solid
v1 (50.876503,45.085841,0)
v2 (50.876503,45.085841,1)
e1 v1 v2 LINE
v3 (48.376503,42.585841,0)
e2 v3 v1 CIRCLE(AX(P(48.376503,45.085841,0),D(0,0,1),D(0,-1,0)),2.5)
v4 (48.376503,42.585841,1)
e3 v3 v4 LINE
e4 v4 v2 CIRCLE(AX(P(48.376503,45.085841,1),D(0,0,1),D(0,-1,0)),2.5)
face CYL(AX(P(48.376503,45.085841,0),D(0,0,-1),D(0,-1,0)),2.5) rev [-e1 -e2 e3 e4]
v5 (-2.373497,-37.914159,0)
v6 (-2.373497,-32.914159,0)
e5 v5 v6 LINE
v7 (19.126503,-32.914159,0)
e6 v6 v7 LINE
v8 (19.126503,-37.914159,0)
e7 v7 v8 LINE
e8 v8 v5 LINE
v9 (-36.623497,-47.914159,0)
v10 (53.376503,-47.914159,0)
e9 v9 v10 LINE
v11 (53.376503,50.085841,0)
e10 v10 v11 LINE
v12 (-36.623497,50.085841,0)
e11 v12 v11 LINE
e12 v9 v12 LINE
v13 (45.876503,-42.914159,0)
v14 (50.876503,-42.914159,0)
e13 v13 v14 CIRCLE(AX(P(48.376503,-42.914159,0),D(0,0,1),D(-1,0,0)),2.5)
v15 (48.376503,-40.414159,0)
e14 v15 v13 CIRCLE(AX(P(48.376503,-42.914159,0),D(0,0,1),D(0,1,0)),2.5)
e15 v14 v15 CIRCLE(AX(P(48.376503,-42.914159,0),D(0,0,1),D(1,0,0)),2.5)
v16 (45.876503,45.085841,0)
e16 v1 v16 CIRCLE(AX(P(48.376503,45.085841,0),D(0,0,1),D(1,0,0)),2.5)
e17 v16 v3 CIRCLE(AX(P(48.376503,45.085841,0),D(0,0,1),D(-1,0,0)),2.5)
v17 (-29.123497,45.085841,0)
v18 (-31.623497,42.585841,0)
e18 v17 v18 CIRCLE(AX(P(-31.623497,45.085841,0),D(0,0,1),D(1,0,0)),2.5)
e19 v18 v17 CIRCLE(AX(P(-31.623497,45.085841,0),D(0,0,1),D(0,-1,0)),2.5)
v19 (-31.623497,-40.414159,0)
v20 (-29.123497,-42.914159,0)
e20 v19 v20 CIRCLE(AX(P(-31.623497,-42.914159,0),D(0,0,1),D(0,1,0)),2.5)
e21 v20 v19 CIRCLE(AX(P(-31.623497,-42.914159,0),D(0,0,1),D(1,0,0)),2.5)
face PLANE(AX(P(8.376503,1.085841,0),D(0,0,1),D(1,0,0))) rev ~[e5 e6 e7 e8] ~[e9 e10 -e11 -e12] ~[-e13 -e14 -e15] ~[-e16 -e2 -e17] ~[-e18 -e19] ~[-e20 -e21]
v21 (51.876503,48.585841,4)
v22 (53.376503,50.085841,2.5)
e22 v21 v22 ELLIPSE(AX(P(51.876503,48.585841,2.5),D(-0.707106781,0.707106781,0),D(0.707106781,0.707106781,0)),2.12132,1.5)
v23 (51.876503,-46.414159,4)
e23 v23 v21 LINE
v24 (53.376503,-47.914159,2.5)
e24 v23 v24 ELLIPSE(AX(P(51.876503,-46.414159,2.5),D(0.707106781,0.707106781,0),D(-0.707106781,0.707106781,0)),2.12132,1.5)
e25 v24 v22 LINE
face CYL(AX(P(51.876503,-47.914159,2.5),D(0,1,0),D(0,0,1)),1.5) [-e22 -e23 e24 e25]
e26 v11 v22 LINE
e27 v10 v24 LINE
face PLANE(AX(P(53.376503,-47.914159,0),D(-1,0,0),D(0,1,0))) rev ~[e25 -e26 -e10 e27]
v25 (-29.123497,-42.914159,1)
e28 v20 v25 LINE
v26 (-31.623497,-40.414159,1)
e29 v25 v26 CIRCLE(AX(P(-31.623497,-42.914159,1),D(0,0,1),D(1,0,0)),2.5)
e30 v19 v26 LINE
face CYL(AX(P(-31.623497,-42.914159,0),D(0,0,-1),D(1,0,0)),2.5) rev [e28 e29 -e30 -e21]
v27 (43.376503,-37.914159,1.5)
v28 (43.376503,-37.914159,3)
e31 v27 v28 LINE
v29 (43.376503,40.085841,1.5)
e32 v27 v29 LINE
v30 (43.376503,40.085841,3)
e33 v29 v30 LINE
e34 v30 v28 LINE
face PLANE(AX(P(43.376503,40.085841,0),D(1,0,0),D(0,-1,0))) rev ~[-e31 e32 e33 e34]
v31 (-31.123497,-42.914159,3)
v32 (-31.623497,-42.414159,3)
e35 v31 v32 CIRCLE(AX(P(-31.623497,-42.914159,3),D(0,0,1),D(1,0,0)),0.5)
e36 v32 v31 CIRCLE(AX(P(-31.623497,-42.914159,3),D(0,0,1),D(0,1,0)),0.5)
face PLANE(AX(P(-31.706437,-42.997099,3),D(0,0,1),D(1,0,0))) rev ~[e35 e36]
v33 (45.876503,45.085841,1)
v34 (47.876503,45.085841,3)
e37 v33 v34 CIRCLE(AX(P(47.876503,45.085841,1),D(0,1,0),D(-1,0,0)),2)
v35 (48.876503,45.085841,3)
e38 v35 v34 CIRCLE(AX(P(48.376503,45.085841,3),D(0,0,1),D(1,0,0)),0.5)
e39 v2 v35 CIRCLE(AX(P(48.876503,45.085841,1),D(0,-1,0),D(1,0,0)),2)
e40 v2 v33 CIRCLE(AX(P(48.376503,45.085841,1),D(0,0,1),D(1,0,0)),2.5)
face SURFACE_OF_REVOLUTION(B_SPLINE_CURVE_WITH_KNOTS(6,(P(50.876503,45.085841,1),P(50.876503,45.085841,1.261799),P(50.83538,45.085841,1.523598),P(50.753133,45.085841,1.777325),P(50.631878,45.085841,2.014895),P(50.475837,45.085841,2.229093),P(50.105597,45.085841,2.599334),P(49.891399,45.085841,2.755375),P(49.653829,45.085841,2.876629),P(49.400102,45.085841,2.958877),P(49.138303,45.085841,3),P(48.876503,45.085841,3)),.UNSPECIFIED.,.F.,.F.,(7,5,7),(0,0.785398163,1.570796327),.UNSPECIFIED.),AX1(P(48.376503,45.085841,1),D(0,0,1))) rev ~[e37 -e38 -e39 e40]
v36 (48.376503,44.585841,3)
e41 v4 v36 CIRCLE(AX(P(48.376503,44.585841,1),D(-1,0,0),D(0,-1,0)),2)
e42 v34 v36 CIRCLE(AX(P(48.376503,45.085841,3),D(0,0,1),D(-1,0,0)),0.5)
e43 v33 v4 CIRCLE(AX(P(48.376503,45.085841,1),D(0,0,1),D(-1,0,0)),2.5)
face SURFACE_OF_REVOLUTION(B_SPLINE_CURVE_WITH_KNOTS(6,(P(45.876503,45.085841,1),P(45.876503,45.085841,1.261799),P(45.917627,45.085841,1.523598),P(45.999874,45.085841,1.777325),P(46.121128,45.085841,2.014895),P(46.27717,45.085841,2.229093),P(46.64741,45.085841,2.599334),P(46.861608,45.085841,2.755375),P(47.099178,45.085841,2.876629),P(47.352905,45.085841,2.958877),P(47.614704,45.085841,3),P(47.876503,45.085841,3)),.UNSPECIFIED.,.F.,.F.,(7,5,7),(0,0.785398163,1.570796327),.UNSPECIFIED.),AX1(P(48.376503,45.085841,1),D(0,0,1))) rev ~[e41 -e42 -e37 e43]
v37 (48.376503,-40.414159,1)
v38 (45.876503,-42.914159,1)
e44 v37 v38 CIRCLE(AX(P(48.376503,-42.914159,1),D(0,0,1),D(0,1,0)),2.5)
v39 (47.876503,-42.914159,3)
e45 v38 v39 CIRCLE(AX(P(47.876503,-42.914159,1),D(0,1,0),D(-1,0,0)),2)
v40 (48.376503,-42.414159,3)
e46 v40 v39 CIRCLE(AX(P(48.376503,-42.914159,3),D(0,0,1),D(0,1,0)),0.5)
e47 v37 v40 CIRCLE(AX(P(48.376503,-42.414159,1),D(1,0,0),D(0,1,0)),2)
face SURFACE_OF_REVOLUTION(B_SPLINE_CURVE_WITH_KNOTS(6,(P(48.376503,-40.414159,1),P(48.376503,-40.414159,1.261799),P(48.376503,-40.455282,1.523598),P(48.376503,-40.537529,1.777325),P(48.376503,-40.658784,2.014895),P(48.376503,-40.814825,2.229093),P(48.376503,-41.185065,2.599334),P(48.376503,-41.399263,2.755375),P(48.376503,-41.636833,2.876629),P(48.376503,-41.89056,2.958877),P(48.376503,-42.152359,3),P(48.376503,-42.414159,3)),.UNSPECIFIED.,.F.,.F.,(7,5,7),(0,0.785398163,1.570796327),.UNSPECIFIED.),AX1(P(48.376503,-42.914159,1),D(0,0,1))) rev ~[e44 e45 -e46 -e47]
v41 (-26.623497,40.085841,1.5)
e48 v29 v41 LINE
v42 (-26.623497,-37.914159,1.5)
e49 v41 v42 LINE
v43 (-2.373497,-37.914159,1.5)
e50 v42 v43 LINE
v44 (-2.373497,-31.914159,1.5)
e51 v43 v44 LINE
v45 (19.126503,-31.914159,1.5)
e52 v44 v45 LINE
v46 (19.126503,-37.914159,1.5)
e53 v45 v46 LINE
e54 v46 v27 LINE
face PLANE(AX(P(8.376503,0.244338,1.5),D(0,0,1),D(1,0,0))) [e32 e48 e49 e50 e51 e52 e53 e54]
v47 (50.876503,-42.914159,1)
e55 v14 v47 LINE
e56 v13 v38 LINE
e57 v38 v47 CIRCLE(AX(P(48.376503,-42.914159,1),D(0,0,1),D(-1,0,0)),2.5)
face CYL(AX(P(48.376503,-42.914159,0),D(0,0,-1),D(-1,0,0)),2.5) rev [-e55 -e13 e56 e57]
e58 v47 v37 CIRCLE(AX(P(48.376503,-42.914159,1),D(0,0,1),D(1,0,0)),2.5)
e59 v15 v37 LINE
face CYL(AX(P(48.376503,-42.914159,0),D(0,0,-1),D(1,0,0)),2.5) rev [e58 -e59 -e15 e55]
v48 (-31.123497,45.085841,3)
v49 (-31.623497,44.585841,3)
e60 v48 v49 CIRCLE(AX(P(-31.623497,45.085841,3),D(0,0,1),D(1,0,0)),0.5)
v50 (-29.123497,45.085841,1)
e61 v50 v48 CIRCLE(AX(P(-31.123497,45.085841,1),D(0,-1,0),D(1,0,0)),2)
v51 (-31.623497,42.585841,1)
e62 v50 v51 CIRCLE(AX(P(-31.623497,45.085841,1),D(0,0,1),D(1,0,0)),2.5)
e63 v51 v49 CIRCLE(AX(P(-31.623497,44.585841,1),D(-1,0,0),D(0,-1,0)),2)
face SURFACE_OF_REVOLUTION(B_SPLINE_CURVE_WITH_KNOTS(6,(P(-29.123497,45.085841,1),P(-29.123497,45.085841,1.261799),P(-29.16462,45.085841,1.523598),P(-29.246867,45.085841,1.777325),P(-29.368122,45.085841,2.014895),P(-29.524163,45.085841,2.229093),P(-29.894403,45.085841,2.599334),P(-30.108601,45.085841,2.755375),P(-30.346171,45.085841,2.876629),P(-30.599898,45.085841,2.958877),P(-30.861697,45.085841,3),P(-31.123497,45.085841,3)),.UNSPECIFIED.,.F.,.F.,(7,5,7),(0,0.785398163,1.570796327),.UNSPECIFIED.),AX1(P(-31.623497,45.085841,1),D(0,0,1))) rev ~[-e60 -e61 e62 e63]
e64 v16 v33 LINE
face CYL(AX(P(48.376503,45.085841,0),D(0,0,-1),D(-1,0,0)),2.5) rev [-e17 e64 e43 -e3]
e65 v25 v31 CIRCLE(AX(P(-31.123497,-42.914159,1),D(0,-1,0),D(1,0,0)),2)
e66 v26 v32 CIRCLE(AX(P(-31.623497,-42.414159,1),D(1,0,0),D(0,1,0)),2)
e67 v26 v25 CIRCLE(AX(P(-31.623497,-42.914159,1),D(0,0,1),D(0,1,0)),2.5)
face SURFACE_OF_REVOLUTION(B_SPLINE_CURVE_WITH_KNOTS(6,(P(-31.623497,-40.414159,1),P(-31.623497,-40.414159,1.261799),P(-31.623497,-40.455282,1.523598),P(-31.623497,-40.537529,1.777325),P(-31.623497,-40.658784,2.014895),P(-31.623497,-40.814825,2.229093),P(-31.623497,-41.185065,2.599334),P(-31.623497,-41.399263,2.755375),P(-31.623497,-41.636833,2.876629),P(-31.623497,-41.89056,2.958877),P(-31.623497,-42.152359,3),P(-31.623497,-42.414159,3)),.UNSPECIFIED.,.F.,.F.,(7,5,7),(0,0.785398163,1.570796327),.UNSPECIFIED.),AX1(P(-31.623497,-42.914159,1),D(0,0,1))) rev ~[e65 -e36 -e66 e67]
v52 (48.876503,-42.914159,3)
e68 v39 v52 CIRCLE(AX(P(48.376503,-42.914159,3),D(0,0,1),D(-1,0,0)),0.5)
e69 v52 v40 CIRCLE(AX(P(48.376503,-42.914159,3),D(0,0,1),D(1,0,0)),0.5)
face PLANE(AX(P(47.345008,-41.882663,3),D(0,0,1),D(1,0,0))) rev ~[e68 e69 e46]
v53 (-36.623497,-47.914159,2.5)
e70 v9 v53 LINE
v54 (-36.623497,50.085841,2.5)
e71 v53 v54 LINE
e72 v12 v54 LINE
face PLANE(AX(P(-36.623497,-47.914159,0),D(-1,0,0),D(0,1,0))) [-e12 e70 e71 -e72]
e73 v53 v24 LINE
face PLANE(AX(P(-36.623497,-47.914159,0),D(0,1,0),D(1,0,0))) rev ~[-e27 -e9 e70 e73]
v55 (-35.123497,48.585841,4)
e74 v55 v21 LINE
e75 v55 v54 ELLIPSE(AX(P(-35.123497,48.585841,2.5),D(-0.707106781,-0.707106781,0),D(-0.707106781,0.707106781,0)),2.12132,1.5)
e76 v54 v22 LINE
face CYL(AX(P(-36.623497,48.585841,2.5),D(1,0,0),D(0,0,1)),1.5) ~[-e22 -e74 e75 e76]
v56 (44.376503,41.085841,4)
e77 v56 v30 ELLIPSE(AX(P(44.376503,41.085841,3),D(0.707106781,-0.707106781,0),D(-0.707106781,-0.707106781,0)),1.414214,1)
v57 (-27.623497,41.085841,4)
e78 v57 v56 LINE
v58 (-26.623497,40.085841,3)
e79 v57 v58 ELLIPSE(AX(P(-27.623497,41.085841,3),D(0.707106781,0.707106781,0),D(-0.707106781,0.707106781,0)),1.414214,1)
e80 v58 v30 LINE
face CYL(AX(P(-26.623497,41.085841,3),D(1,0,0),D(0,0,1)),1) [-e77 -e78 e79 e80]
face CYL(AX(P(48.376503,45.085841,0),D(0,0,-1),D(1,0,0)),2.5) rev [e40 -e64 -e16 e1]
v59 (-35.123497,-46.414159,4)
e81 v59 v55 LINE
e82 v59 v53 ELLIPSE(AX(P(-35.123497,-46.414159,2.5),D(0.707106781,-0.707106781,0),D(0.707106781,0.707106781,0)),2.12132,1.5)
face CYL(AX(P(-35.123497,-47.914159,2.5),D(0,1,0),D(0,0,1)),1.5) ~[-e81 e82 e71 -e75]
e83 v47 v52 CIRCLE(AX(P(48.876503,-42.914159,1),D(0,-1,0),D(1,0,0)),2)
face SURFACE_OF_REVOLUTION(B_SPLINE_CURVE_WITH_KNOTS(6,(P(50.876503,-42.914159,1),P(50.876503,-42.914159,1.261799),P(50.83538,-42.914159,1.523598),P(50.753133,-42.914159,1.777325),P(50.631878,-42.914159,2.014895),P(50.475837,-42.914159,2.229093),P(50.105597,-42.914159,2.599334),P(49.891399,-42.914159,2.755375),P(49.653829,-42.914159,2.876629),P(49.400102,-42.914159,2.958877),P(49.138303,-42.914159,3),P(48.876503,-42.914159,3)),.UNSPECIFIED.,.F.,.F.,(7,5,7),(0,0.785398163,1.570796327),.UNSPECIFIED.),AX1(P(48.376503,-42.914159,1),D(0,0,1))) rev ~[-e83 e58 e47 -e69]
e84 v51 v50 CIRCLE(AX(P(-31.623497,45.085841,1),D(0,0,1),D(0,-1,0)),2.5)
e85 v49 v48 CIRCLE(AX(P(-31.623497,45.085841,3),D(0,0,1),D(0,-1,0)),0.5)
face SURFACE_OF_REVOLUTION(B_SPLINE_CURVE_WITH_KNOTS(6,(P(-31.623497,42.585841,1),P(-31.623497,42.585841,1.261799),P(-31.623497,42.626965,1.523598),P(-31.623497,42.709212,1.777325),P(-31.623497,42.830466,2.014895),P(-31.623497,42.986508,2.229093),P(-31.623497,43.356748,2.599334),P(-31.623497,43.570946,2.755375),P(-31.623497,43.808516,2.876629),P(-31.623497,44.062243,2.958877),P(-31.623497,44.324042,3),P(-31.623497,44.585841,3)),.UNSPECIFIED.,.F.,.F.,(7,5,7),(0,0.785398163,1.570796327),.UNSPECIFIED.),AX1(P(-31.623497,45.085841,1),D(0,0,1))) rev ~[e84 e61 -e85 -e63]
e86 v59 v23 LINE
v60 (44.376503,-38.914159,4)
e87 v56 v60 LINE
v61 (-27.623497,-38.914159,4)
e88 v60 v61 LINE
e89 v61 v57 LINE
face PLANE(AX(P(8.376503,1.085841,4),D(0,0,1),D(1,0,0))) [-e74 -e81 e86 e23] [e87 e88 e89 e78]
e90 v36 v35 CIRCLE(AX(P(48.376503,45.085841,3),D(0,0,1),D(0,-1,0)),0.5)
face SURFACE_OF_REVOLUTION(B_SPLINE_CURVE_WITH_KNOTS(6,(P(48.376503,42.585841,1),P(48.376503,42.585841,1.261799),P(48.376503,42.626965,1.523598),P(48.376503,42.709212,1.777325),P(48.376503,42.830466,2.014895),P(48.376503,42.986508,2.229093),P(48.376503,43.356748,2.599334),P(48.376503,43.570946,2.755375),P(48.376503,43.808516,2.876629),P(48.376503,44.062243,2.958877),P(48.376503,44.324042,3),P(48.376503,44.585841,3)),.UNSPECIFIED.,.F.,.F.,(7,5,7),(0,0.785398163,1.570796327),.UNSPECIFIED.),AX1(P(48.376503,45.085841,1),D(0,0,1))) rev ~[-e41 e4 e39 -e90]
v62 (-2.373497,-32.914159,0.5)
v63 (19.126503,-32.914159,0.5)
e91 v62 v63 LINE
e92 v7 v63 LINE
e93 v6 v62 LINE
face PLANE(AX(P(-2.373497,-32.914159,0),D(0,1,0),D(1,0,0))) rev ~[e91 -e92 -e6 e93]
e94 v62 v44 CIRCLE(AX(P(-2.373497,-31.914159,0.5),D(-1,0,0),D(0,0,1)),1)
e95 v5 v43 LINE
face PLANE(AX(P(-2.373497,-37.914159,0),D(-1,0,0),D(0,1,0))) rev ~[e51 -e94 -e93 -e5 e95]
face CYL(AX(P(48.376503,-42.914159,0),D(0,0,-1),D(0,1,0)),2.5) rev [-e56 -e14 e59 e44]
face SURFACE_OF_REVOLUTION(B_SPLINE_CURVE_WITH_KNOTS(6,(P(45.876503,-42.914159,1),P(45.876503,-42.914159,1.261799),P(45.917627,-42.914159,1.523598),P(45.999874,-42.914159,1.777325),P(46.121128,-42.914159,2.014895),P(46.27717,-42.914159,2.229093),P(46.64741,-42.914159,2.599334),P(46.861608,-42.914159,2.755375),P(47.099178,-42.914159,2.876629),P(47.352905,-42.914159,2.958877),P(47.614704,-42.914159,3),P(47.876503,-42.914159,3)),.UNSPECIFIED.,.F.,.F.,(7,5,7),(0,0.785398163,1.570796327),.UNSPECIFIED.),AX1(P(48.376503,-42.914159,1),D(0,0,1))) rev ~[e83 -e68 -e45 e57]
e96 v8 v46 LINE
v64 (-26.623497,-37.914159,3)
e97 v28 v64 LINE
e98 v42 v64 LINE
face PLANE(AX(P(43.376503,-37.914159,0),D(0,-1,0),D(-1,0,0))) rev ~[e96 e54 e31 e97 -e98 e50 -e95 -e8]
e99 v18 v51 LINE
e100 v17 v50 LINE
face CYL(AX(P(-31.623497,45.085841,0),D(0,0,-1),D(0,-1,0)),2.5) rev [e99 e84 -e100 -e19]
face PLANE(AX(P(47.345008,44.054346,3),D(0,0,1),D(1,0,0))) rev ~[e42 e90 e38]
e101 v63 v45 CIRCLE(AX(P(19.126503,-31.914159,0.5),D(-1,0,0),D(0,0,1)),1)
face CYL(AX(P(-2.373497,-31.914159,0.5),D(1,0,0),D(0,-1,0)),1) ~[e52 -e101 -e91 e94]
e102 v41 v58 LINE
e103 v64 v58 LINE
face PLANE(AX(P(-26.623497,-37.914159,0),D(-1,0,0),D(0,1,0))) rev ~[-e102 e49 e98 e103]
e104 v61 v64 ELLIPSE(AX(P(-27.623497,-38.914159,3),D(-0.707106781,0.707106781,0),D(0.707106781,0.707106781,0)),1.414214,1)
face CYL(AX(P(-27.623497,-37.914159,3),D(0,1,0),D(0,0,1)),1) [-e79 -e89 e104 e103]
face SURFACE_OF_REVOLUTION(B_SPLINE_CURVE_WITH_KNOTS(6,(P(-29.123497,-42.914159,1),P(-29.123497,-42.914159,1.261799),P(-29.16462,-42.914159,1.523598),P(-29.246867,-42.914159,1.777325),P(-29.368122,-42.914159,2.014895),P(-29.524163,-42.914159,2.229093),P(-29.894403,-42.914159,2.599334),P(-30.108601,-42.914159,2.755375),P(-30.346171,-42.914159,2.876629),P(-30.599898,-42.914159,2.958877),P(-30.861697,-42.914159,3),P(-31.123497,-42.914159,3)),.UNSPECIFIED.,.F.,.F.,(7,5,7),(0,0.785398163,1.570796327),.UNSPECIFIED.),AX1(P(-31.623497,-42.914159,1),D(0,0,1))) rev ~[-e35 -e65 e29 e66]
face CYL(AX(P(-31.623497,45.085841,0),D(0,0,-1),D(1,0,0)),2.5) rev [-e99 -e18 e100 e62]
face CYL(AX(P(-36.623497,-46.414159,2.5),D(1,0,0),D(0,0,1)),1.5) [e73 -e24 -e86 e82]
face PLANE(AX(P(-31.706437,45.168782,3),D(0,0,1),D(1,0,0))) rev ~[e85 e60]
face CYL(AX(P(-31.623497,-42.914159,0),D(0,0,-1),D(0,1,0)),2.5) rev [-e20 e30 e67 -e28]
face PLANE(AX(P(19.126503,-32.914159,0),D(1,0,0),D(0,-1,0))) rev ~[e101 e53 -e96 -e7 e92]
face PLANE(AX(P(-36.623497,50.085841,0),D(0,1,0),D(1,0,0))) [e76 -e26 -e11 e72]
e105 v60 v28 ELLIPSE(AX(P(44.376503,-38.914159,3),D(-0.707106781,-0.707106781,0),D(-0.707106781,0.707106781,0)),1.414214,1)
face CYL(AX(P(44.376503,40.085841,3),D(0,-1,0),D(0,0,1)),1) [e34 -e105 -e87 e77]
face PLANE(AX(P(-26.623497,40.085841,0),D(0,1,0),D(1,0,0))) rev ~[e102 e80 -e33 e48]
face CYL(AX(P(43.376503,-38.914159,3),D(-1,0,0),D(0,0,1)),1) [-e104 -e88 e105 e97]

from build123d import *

# Parameters (mm, degrees)
F1_DEPTH = 1.5
F0_W     = 90
F0_H     = 98
F2_DEPTH = 4
F3_R     = 1
F4_R     = 1.5
F5_DEPTH = 3
F6_R     = 2


with BuildPart() as f1:
    # F0 (on Top) → F1 (new body)
    with BuildSketch(Plane.XY):
        Polygon((43.3765034378, 40.0858414471), (-26.6234965622, 40.0858414471), (-26.6234965622, -37.9141585529), (-2.3734965622, -37.9141585529), (-2.3734965622, -32.9141585529), (19.1265034378, -32.9141585529), (19.1265034378, -37.9141585529), (43.3765034378, -37.9141585529), align=None)
    extrude(amount=F1_DEPTH)

    # F0 (on Top) → F2 (join)
    with BuildSketch(Plane.XY):
        with Locations((8.3765034378, 1.0858414471)):
            Rectangle(F0_W, F0_H)
        with BuildLine():
            ThreePointArc((-31.6234965622, 42.5858414471), (-33.3912635152, 46.8536084001), (-29.1234965622, 45.0858414471))
            Line((-29.1234965622, 45.0858414471), (45.8765034378, 45.0858414471))
            ThreePointArc((45.8765034378, 45.0858414471), (48.3765034378, 47.5858414471), (50.8765034378, 45.0858414471))
            ThreePointArc((50.8765034378, 45.0858414471), (50.1442703907, 43.3180744941), (48.3765034378, 42.5858414471))
            Line((48.3765034378, 42.5858414471), (48.3765034378, -40.4141585529))
            ThreePointArc((48.3765034378, -40.4141585529), (50.1442703907, -41.1463915999), (50.8765034378, -42.9141585529))
            ThreePointArc((50.8765034378, -42.9141585529), (48.3765034378, -45.4141585529), (45.8765034378, -42.9141585529))
            Line((45.8765034378, -42.9141585529), (-29.1234965622, -42.9141585529))
            ThreePointArc((-29.1234965622, -42.9141585529), (-33.3912635152, -44.6819255059), (-31.6234965622, -40.4141585529))
            Line((-31.6234965622, -40.4141585529), (-31.6234965622, 42.5858414471))
        make_face(mode=Mode.SUBTRACT)
        with BuildLine():
            Line((-31.6234965622, -42.9141585529), (-31.6234965622, -40.4141585529))
            ThreePointArc((-31.6234965622, -40.4141585529), (-33.3912635152, -44.6819255059), (-29.1234965622, -42.9141585529))
            Line((-29.1234965622, -42.9141585529), (-31.6234965622, -42.9141585529))
        make_face()
        with BuildLine():
            Line((45.8765034378, 45.0858414471), (-29.1234965622, 45.0858414471))
            ThreePointArc((-29.1234965622, 45.0858414471), (-29.8557296093, 43.3180744941), (-31.6234965622, 42.5858414471))
            Line((-31.6234965622, 42.5858414471), (-31.6234965622, -40.4141585529))
            ThreePointArc((-31.6234965622, -40.4141585529), (-29.8557296093, -41.1463915999), (-29.1234965622, -42.9141585529))
            Line((-29.1234965622, -42.9141585529), (45.8765034378, -42.9141585529))
            ThreePointArc((45.8765034378, -42.9141585529), (46.6087364848, -41.1463915999), (48.3765034378, -40.4141585529))
            Line((48.3765034378, -40.4141585529), (48.3765034378, 42.5858414471))
            ThreePointArc((48.3765034378, 42.5858414471), (46.6087364848, 43.3180744941), (45.8765034378, 45.0858414471))
        make_face()
        Polygon((-26.6234965622, -37.9141585529), (-26.6234965622, 40.0858414471), (43.3765034378, 40.0858414471), (43.3765034378, -37.9141585529), (19.1265034378, -37.9141585529), (-2.3734965622, -37.9141585529), align=None, mode=Mode.SUBTRACT)
        with BuildLine():
            ThreePointArc((-29.1234965622, -42.9141585529), (-29.8557296093, -41.1463915999), (-31.6234965622, -40.4141585529))
            Line((-31.6234965622, -40.4141585529), (-31.6234965622, -42.9141585529))
            Line((-31.6234965622, -42.9141585529), (-29.1234965622, -42.9141585529))
        make_face()
        with BuildLine():
            ThreePointArc((50.8765034378, -42.9141585529), (50.1442703907, -41.1463915999), (48.3765034378, -40.4141585529))
            Line((48.3765034378, -40.4141585529), (48.3765034378, -42.9141585529))
            Line((48.3765034378, -42.9141585529), (45.8765034378, -42.9141585529))
            ThreePointArc((45.8765034378, -42.9141585529), (48.3765034378, -45.4141585529), (50.8765034378, -42.9141585529))
        make_face()
        with BuildLine():
            Line((48.3765034378, -42.9141585529), (48.3765034378, -40.4141585529))
            ThreePointArc((48.3765034378, -40.4141585529), (46.6087364848, -41.1463915999), (45.8765034378, -42.9141585529))
            Line((45.8765034378, -42.9141585529), (48.3765034378, -42.9141585529))
        make_face()
        with BuildLine():
            Line((48.3765034378, 45.0858414471), (45.8765034378, 45.0858414471))
            ThreePointArc((45.8765034378, 45.0858414471), (46.6087364848, 43.3180744941), (48.3765034378, 42.5858414471))
            Line((48.3765034378, 42.5858414471), (48.3765034378, 45.0858414471))
        make_face()
        with BuildLine():
            ThreePointArc((50.8765034378, 45.0858414471), (48.3765034378, 47.5858414471), (45.8765034378, 45.0858414471))
            Line((45.8765034378, 45.0858414471), (48.3765034378, 45.0858414471))
            Line((48.3765034378, 45.0858414471), (48.3765034378, 42.5858414471))
            ThreePointArc((48.3765034378, 42.5858414471), (50.1442703907, 43.3180744941), (50.8765034378, 45.0858414471))
        make_face()
        with BuildLine():
            Line((-31.6234965622, 42.5858414471), (-31.6234965622, 45.0858414471))
            Line((-31.6234965622, 45.0858414471), (-29.1234965622, 45.0858414471))
            ThreePointArc((-29.1234965622, 45.0858414471), (-33.3912635152, 46.8536084001), (-31.6234965622, 42.5858414471))
        make_face()
        with BuildLine():
            Line((-29.1234965622, 45.0858414471), (-31.6234965622, 45.0858414471))
            Line((-31.6234965622, 45.0858414471), (-31.6234965622, 42.5858414471))
            ThreePointArc((-31.6234965622, 42.5858414471), (-29.8557296093, 43.3180744941), (-29.1234965622, 45.0858414471))
        make_face()
    extrude(amount=F2_DEPTH)

    # F3
    f3_edges = [f1.edges().sort_by_distance(p)[0] for p in [
        (8.376503, -32.914159, 1.5),
        (-26.623497, 1.085841, 4),
        (8.376503, -37.914159, 4),
        (43.376503, 1.085841, 4),
        (8.376503, 40.085841, 4),
    ]]
    fillet(f3_edges, radius=F3_R)

    # F4
    f4_edges = [f1.edges().sort_by_distance(p)[0] for p in [
        (-36.623497, 1.085841, 4),
        (8.376503, 50.085841, 4),
        (53.376503, 1.085841, 4),
        (8.376503, -47.914159, 4),
    ]]
    fillet(f4_edges, radius=F4_R)

    # F0 (on Top) → F5 (cut)
    with BuildSketch(Plane.XY):
        with BuildLine():
            Line((48.3765034378, 45.0858414471), (45.8765034378, 45.0858414471))
            ThreePointArc((45.8765034378, 45.0858414471), (46.6087364848, 43.3180744941), (48.3765034378, 42.5858414471))
            Line((48.3765034378, 42.5858414471), (48.3765034378, 45.0858414471))
        make_face()
        with BuildLine():
            ThreePointArc((50.8765034378, 45.0858414471), (48.3765034378, 47.5858414471), (45.8765034378, 45.0858414471))
            Line((45.8765034378, 45.0858414471), (48.3765034378, 45.0858414471))
            Line((48.3765034378, 45.0858414471), (48.3765034378, 42.5858414471))
            ThreePointArc((48.3765034378, 42.5858414471), (50.1442703907, 43.3180744941), (50.8765034378, 45.0858414471))
        make_face()
        with BuildLine():
            Line((-31.6234965622, 42.5858414471), (-31.6234965622, 45.0858414471))
            Line((-31.6234965622, 45.0858414471), (-29.1234965622, 45.0858414471))
            ThreePointArc((-29.1234965622, 45.0858414471), (-33.3912635152, 46.8536084001), (-31.6234965622, 42.5858414471))
        make_face()
        with BuildLine():
            Line((-29.1234965622, 45.0858414471), (-31.6234965622, 45.0858414471))
            Line((-31.6234965622, 45.0858414471), (-31.6234965622, 42.5858414471))
            ThreePointArc((-31.6234965622, 42.5858414471), (-29.8557296093, 43.3180744941), (-29.1234965622, 45.0858414471))
        make_face()
        with BuildLine():
            Line((48.3765034378, -42.9141585529), (48.3765034378, -40.4141585529))
            ThreePointArc((48.3765034378, -40.4141585529), (46.6087364848, -41.1463915999), (45.8765034378, -42.9141585529))
            Line((45.8765034378, -42.9141585529), (48.3765034378, -42.9141585529))
        make_face()
        with BuildLine():
            ThreePointArc((50.8765034378, -42.9141585529), (50.1442703907, -41.1463915999), (48.3765034378, -40.4141585529))
            Line((48.3765034378, -40.4141585529), (48.3765034378, -42.9141585529))
            Line((48.3765034378, -42.9141585529), (45.8765034378, -42.9141585529))
            ThreePointArc((45.8765034378, -42.9141585529), (48.3765034378, -45.4141585529), (50.8765034378, -42.9141585529))
        make_face()
        with BuildLine():
            Line((-31.6234965622, -42.9141585529), (-31.6234965622, -40.4141585529))
            ThreePointArc((-31.6234965622, -40.4141585529), (-33.3912635152, -44.6819255059), (-29.1234965622, -42.9141585529))
            Line((-29.1234965622, -42.9141585529), (-31.6234965622, -42.9141585529))
        make_face()
        with BuildLine():
            ThreePointArc((-29.1234965622, -42.9141585529), (-29.8557296093, -41.1463915999), (-31.6234965622, -40.4141585529))
            Line((-31.6234965622, -40.4141585529), (-31.6234965622, -42.9141585529))
            Line((-31.6234965622, -42.9141585529), (-29.1234965622, -42.9141585529))
        make_face()
    extrude(amount=F5_DEPTH, mode=Mode.SUBTRACT)

    # F6
    f6_edges = [f1.edges().sort_by_distance(p)[0] for p in [
        (50.876503, -42.914159, 3),
        (48.376503, 47.585841, 3),
        (-31.623497, 47.585841, 3),
        (-34.123497, -42.914159, 3),
    ]]
    fillet(f6_edges, radius=F6_R)


solid = f1.part
